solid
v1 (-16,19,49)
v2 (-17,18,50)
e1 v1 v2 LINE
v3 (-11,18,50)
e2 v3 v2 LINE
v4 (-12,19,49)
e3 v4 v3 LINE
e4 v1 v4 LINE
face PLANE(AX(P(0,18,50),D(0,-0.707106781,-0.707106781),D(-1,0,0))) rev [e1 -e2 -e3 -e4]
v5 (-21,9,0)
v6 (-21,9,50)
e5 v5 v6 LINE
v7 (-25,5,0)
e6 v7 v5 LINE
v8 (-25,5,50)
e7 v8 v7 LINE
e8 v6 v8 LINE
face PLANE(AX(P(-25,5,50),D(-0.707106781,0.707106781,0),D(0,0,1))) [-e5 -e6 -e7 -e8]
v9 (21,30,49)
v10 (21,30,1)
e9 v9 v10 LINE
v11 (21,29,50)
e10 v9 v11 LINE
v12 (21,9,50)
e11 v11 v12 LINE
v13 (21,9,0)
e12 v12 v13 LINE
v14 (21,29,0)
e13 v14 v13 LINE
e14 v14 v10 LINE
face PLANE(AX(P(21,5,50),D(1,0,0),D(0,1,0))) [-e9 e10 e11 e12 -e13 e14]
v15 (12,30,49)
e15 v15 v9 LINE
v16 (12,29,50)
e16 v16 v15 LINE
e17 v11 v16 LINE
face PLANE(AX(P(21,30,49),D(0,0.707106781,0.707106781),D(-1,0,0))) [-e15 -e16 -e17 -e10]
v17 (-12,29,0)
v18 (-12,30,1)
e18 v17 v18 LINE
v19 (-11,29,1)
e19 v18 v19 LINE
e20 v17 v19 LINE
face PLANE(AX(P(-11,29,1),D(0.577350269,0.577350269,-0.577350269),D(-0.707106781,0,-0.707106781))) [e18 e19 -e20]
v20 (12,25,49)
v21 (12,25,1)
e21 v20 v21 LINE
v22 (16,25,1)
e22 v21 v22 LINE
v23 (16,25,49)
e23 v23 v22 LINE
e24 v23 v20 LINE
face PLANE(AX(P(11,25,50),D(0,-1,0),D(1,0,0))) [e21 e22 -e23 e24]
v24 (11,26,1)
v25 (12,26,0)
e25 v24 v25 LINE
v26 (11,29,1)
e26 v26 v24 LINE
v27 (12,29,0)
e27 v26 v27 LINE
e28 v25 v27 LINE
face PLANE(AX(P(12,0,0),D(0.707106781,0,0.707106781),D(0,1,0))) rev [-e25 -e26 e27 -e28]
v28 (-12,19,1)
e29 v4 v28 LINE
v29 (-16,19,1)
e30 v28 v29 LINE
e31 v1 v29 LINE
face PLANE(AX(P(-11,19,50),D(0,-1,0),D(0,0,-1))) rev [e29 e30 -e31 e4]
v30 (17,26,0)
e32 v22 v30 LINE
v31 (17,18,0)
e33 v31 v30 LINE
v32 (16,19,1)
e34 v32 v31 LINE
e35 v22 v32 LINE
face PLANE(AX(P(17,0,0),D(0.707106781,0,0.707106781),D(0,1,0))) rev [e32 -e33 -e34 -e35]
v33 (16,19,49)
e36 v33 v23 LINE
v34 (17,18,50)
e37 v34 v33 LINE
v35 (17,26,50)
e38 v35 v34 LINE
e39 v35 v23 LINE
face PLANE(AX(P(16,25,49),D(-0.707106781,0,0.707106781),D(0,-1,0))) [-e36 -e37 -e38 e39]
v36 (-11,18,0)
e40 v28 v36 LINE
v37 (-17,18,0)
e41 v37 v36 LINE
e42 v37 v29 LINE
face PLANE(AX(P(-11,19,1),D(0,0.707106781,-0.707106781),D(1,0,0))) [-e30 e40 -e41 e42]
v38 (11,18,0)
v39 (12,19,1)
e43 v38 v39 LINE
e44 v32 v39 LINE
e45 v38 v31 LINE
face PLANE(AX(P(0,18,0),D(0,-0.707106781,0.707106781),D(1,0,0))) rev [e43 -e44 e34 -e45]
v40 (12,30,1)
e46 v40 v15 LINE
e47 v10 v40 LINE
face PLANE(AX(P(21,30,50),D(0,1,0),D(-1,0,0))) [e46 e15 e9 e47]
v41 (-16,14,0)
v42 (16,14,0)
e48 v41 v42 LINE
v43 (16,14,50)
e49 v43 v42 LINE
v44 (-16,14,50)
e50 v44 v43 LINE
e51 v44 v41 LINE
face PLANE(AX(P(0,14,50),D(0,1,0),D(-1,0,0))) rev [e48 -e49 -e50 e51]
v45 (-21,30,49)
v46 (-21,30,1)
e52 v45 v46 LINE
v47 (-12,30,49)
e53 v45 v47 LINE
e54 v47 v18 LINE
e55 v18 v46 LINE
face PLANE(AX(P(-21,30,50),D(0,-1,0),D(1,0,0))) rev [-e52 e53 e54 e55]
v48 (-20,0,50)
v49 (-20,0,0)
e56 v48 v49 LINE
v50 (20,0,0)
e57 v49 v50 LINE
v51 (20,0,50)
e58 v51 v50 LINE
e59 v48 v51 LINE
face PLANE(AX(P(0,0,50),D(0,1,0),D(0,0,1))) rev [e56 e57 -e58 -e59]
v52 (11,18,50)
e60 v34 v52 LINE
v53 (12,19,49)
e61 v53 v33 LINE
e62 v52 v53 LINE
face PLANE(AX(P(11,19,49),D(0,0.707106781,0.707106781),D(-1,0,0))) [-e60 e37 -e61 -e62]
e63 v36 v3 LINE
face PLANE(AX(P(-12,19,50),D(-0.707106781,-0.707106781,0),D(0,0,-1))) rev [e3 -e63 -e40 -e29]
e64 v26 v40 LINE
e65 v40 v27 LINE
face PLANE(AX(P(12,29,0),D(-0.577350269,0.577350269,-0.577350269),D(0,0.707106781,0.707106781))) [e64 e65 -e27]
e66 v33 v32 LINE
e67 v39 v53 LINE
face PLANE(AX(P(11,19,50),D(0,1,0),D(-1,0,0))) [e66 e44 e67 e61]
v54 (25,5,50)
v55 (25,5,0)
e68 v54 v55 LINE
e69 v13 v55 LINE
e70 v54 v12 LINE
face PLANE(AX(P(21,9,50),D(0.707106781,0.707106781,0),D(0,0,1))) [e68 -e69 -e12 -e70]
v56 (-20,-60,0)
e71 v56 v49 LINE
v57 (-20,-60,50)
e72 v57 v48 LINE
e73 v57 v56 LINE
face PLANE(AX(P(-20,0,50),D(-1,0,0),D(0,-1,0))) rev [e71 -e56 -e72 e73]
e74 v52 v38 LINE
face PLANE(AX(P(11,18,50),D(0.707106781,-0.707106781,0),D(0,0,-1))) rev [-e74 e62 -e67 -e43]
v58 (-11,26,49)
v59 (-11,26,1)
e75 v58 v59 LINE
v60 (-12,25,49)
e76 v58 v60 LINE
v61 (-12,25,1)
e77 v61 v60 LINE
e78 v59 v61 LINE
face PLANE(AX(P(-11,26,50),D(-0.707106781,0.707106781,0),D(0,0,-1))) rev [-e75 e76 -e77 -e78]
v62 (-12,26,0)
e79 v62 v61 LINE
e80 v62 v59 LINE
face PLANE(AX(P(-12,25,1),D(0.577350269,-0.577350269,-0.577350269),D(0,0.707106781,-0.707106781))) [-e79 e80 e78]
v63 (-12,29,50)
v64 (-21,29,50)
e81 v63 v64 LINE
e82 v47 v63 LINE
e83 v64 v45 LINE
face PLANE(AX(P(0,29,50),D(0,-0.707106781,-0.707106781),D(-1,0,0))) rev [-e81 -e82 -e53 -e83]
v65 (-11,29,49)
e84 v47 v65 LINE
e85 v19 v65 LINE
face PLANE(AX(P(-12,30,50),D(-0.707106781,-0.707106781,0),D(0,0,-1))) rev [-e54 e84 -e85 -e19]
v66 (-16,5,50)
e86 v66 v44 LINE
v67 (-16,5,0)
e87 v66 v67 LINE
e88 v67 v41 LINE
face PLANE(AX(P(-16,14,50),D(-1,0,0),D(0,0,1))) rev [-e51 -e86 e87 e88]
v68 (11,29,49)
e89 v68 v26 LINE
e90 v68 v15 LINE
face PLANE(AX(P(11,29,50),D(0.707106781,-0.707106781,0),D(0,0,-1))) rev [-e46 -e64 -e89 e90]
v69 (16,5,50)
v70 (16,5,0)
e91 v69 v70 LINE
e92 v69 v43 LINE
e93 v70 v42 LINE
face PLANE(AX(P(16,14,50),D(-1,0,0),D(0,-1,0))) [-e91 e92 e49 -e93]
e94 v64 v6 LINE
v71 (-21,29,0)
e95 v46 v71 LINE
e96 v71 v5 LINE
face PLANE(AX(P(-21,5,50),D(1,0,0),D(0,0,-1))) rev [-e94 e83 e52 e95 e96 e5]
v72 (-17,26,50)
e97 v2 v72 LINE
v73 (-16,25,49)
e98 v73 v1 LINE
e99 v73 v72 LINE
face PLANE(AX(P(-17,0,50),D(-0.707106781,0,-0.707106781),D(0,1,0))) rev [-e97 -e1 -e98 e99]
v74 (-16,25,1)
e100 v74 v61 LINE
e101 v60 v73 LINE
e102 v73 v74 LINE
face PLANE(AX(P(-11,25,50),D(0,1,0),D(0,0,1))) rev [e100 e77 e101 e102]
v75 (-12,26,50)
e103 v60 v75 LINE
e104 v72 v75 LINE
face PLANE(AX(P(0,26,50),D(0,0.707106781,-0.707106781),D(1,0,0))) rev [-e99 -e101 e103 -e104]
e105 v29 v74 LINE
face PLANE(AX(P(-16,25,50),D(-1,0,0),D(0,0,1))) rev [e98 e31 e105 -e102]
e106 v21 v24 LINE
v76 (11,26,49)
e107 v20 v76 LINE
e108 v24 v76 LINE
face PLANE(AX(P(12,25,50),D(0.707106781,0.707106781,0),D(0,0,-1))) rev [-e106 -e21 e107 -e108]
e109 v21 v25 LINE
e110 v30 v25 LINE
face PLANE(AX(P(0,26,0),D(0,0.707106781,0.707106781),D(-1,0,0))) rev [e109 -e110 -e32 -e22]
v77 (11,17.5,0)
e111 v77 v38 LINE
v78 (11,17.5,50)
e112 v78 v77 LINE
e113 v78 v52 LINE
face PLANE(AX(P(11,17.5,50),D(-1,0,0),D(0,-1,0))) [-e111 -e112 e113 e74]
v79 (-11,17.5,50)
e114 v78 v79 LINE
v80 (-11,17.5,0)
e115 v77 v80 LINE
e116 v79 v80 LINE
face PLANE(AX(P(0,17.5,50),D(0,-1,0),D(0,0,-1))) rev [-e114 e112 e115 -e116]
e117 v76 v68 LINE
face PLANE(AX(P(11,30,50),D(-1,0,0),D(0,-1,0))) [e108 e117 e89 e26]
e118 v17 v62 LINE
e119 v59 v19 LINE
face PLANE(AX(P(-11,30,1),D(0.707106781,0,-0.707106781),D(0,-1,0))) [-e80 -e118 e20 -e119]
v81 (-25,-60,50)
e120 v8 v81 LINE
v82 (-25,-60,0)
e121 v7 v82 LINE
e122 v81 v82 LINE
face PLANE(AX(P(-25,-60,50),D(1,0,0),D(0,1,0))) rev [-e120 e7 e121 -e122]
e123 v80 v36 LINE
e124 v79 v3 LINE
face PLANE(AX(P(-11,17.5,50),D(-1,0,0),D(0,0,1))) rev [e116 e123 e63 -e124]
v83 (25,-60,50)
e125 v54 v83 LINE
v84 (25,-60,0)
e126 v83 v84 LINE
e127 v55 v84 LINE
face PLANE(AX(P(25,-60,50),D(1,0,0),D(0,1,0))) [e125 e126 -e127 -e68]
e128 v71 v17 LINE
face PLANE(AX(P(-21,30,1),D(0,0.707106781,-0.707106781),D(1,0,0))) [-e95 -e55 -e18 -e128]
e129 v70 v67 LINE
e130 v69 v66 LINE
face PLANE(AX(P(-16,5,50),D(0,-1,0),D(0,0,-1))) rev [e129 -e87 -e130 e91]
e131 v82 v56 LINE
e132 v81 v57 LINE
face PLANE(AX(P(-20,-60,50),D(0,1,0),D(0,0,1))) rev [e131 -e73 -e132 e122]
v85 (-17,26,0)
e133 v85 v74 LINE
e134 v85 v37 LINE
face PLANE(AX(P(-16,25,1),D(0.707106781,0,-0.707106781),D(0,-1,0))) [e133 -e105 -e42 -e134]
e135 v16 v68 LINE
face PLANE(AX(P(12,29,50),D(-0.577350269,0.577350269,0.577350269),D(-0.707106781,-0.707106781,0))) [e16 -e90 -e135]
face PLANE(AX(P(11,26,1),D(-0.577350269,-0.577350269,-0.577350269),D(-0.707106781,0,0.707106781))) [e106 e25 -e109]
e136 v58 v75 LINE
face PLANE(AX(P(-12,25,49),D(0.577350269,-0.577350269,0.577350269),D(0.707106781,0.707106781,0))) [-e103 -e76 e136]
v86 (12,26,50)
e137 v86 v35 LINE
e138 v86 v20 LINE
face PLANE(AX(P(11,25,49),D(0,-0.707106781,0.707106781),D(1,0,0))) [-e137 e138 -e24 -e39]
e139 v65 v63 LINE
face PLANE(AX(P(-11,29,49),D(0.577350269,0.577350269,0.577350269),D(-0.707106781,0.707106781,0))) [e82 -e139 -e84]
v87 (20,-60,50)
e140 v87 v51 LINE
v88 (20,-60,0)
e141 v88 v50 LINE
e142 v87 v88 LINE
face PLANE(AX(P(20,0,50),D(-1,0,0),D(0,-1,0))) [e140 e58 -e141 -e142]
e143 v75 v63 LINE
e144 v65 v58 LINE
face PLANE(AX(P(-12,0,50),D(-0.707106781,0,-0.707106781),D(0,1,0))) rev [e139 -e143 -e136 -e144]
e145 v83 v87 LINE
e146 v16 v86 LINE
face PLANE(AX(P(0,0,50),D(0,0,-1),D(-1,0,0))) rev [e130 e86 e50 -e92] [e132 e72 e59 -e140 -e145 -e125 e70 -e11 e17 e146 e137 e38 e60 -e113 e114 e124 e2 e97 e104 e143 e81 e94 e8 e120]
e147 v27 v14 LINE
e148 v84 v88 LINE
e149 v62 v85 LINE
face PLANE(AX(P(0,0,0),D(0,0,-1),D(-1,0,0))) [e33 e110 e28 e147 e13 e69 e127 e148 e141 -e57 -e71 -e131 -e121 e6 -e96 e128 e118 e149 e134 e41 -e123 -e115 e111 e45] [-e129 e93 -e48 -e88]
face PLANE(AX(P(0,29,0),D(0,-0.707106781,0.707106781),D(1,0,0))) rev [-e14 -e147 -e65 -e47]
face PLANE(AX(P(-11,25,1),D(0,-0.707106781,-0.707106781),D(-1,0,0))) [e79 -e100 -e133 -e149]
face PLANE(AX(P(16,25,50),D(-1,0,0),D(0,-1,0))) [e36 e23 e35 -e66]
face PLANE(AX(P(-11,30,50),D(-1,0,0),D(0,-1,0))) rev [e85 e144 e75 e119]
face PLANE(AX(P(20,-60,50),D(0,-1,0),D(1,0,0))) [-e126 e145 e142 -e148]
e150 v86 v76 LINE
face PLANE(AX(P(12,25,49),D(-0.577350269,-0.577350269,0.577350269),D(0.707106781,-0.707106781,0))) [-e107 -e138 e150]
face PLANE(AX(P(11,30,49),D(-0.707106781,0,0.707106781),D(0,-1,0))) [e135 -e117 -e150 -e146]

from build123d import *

# Parameters (mm, degrees)
BOSS_EXTRUDE1_DEPTH = 50
CHAMFER2_SIZE       = 1
CHAMFER3_SIZE       = 4


with BuildPart() as part:
    # Sketch1 → Boss-Extrude1 (new body)
    with BuildSketch(Plane.XY):
        Polygon((0, 0), (-20, 0), (-20, -60), (-25, -60), (-25, 5), (-21, 5), (-21, 30), (-11, 30), (-11, 25), (-16, 25), (-16, 19), (-11, 19), (-11, 17.5), (0, 17.5), (0, 14), (-16, 14), (-16, 5), (0, 5), align=None)
    boss_extrude1 = extrude(amount=BOSS_EXTRUDE1_DEPTH)

    # Mirror1: Boss-Extrude1 across plane
    add(boss_extrude1.mirror(Plane(origin=(0, 5, 50), x_dir=(0, 0, 1), z_dir=(-1, 0, 0))))

    # Chamfer2
    chamfer2_edges = [part.edges().sort_by_distance(p)[0] for p in [
        (-16, 30, 0),
        (-11, 27.5, 0),
        (-13.5, 25, 0),
        (-16, 22, 0),
        (-13.5, 19, 0),
        (-11, 30, 25),
        (-11, 25, 25),
        (-11, 19, 25),
        (-13.5, 19, 50),
        (-16, 22, 50),
        (-13.5, 25, 50),
        (-11, 27.5, 50),
        (-16, 30, 50),
        (16, 30, 50),
        (11, 27.5, 50),
        (11, 30, 25),
        (13.5, 25, 50),
        (11, 25, 25),
        (16, 22, 50),
        (13.5, 19, 50),
        (11, 19, 25),
        (13.5, 19, 0),
        (16, 22, 0),
        (13.5, 25, 0),
        (11, 27.5, 0),
        (16, 30, 0),
    ]]
    chamfer(chamfer2_edges, length=CHAMFER2_SIZE)

    # Chamfer3
    chamfer3_edges = [part.edges().sort_by_distance(p)[0] for p in [
        (21, 5, 25),
        (-21, 5, 25),
    ]]
    chamfer(chamfer3_edges, length=CHAMFER3_SIZE - 0.0001)  # a hair under: the kernel refuses the full size


solid = part.part
